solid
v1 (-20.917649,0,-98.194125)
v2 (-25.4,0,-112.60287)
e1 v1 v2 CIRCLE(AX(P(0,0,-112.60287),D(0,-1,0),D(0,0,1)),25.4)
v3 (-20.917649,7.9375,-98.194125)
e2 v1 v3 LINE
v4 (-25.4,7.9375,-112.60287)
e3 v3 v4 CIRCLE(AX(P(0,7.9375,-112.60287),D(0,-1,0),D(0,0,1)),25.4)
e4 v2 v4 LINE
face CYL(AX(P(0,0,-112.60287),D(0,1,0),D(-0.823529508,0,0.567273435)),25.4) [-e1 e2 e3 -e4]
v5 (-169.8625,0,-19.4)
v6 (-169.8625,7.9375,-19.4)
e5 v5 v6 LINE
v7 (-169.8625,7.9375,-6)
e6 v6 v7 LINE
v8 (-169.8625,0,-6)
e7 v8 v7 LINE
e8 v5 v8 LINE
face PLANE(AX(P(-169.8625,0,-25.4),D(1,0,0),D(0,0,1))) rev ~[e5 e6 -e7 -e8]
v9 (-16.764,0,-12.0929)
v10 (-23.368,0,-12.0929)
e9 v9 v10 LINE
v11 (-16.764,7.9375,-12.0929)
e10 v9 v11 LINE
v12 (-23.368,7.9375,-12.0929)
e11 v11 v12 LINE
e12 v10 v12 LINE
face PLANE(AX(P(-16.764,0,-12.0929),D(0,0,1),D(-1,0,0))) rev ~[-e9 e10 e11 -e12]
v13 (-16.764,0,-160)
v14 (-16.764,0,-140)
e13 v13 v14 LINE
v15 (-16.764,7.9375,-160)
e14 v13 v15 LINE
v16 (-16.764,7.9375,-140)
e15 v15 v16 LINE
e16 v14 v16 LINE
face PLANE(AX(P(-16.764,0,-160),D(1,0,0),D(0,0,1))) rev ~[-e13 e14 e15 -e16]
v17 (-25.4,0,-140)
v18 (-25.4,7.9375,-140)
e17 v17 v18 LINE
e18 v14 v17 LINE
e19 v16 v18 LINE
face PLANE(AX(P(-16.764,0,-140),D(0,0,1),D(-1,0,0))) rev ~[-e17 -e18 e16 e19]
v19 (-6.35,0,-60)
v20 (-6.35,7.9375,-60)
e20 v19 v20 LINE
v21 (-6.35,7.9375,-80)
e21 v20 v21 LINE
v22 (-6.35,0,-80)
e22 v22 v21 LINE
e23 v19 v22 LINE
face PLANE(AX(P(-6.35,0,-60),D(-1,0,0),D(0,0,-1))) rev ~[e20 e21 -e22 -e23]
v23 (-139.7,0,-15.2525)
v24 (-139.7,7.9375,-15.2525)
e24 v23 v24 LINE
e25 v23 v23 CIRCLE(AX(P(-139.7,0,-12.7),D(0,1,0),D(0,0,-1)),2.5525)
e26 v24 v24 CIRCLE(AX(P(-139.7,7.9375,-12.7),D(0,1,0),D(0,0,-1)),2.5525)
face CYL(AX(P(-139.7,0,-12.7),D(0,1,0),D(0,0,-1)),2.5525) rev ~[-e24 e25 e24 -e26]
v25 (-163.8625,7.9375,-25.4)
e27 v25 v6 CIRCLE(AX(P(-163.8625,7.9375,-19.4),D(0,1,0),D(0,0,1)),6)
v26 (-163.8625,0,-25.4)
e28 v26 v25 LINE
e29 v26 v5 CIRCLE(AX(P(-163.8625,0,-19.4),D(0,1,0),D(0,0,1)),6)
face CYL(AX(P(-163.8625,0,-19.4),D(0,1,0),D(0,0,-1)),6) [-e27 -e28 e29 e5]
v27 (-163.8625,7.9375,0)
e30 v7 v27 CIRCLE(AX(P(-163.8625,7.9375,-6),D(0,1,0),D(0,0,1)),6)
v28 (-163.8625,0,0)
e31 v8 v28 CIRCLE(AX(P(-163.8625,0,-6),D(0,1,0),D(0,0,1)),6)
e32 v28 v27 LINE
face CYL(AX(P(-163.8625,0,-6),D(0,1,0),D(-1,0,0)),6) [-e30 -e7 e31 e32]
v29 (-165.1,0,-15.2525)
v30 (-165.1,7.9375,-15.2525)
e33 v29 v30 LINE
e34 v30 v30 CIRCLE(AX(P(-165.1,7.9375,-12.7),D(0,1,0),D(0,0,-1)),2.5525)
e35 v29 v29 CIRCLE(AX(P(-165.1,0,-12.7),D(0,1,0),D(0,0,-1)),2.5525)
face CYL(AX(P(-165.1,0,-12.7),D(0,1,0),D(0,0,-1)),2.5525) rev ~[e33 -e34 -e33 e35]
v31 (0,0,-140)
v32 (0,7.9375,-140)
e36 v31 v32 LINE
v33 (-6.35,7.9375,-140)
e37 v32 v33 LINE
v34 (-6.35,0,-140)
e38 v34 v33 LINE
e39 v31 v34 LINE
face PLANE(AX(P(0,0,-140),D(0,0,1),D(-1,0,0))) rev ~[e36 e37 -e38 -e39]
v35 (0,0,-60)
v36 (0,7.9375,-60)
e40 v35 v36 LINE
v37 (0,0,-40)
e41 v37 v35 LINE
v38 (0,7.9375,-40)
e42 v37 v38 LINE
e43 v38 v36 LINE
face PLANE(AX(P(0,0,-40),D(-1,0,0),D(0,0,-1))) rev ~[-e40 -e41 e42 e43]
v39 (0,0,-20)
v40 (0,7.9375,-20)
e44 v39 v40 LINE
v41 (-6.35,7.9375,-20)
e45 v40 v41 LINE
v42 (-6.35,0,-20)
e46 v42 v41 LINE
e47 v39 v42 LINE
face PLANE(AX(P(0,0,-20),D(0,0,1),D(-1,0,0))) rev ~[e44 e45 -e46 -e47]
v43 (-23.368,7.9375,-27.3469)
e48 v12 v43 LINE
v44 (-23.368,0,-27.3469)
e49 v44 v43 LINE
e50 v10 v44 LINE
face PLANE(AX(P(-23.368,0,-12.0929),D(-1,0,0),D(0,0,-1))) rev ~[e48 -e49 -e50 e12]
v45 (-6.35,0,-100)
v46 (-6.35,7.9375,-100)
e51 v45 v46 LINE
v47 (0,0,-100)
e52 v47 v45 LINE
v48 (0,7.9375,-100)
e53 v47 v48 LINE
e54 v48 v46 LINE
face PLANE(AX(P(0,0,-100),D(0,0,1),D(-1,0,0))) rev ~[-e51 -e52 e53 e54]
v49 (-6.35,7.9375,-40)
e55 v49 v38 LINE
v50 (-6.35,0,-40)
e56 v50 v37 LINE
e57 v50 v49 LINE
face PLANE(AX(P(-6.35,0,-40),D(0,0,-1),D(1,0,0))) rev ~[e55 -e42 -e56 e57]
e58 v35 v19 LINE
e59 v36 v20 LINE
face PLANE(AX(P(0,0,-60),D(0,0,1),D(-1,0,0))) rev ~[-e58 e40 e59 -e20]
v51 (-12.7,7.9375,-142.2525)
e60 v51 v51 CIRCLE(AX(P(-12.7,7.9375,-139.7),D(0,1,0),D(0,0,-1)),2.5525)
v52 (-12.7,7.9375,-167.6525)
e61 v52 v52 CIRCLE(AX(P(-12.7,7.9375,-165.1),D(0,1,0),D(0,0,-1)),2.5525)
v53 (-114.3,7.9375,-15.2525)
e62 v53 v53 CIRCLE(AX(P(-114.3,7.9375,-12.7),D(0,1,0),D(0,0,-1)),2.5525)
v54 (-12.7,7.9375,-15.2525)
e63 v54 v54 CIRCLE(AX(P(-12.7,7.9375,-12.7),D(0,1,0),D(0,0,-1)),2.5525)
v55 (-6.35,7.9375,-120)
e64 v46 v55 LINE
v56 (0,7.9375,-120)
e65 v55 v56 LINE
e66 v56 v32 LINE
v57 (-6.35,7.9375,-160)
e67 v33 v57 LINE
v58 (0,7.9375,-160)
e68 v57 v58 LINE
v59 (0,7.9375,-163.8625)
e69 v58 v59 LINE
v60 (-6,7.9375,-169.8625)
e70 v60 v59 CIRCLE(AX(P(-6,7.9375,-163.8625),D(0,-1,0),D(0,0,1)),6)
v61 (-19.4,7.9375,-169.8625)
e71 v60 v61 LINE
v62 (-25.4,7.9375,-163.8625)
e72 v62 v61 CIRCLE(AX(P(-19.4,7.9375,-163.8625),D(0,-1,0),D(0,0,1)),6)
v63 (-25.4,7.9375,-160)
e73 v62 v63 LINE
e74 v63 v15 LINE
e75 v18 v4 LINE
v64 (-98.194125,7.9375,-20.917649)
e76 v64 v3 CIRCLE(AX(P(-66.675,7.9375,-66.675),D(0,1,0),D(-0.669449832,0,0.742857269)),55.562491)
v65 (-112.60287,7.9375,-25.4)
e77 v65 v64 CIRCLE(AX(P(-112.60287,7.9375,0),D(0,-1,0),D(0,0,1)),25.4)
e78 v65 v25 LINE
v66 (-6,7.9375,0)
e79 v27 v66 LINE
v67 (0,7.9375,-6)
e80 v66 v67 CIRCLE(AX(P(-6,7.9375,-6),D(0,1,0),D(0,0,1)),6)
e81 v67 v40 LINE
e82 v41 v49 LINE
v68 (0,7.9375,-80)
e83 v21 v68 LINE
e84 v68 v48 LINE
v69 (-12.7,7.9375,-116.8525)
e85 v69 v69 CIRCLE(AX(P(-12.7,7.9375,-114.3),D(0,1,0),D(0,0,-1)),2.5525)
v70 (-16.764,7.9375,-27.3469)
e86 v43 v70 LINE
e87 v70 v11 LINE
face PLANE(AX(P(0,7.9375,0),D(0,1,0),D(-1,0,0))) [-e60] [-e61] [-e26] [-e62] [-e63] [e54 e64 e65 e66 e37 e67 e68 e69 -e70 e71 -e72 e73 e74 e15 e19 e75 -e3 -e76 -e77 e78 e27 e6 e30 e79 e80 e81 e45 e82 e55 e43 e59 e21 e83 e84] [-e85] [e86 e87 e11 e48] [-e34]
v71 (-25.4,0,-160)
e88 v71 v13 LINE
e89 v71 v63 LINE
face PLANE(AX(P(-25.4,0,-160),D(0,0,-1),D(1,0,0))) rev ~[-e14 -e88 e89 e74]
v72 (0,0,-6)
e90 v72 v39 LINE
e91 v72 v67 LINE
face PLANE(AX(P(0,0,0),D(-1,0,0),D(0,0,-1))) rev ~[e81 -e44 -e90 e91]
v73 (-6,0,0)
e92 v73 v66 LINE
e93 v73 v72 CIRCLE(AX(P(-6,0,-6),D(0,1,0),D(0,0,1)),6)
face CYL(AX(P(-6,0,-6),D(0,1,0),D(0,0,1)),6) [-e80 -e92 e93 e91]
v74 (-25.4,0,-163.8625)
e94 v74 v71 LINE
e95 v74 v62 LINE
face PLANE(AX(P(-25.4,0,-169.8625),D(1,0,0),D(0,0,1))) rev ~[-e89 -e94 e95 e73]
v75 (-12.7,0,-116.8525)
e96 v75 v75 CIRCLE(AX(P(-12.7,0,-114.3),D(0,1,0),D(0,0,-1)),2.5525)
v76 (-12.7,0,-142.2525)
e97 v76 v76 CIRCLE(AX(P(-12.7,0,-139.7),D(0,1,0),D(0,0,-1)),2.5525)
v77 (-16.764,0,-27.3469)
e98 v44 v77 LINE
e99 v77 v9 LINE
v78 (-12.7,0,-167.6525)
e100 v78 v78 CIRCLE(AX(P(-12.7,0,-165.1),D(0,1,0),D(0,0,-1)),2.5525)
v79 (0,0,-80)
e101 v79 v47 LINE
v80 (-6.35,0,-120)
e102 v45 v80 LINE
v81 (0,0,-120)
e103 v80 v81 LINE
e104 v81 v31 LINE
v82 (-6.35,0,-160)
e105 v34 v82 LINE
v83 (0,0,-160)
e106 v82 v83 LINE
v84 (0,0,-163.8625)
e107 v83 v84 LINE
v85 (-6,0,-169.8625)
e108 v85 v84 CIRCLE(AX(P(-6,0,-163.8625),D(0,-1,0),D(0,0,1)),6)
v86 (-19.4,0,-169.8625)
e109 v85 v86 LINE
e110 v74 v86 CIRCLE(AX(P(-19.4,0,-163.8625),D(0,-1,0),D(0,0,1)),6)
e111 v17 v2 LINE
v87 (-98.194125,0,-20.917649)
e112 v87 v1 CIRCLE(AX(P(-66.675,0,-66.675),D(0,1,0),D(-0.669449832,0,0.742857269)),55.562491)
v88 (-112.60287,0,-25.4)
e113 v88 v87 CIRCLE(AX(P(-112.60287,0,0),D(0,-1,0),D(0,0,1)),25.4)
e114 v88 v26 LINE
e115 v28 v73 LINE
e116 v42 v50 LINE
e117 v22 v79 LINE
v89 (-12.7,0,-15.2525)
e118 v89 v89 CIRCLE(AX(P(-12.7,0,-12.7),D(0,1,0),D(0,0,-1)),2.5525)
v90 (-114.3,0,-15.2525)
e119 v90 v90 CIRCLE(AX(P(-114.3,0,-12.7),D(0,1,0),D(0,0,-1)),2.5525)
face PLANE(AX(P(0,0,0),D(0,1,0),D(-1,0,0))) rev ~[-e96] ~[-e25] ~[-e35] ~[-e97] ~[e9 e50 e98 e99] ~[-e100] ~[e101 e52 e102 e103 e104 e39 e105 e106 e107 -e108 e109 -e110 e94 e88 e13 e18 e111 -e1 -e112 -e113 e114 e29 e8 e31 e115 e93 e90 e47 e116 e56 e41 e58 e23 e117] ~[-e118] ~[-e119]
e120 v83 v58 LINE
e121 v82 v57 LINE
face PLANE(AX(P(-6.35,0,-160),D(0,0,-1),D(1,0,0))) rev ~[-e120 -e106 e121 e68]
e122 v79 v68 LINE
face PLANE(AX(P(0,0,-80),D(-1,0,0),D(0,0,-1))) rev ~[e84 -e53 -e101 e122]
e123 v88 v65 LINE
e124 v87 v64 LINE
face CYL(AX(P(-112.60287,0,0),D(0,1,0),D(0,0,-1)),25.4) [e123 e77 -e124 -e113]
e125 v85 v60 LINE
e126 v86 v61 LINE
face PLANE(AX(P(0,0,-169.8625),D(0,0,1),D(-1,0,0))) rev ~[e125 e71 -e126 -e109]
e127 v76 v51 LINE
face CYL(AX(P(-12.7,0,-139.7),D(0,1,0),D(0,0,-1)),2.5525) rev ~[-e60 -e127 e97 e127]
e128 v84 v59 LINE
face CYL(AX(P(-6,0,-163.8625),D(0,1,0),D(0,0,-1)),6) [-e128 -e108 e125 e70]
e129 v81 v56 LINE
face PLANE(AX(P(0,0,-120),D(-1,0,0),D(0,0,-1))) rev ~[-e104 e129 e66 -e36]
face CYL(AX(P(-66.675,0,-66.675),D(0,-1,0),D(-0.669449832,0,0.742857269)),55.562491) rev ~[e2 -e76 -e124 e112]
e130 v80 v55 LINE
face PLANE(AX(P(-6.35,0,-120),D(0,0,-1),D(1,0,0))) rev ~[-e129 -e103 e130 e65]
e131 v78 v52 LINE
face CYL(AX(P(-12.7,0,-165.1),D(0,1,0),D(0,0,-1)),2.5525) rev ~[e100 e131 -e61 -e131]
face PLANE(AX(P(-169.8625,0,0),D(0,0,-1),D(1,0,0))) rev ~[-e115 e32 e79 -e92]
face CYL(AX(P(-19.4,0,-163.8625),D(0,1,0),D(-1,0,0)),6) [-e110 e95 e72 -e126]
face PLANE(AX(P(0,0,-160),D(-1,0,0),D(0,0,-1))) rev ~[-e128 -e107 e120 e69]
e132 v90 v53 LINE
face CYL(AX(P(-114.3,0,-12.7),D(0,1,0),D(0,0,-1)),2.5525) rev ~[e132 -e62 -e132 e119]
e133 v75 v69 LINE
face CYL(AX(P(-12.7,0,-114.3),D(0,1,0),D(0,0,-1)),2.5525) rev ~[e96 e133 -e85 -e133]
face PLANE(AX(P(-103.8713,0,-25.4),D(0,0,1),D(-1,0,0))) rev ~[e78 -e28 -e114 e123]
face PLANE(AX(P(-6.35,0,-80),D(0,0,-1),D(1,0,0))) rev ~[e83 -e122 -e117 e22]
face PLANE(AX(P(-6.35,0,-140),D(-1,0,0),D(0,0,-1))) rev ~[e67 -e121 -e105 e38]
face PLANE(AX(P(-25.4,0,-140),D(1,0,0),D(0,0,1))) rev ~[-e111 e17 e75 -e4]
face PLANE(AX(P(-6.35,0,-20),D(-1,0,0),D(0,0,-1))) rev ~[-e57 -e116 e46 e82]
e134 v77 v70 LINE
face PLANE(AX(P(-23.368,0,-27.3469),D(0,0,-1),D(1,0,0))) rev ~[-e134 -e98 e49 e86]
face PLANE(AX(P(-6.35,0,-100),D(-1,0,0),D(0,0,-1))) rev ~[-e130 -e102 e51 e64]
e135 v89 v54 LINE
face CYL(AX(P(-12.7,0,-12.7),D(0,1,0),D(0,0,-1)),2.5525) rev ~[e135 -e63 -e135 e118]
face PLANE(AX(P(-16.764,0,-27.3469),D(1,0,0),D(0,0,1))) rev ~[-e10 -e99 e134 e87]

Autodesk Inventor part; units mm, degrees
ref_plane "YZ Plane" through (0, 0, 0) normal (1, 0, 0) x (0, 1, 0)
ref_plane "XZ Plane" through (0, 0, 0) normal (0, 1, 0) x (-1, 0, 0)
ref_plane "XY Plane" through (0, 0, 0) normal (0, 0, 1) x (1, 0, 0)
sketch "Sketch1" plane through (0, 0, 0) normal (0, 1, 0) x (-1, 0, 0)
  line L0 (169.8625, 0) -> (0, 0)
  line L1 (0, 0) -> (0, -169.8625)
  line L2 (0, -169.8625) -> (25.4, -169.8625)
  line L3 (25.4, -169.8625) -> (25.4, -103.8713)
  line L4 (103.8713, -25.4) -> (169.8625, -25.4)
  line L5 (169.8625, -25.4) -> (169.8625, 0)
  arc A0 (103.8713, -25.4) -> (25.4, -103.8713) centre (66.675, -66.675) ccw
  line L6 (0, 0) -> (66.675, -66.675) construction
  line L7 (0, -20) -> (6.35, -20)
  line L8 (6.35, -20) -> (6.35, -40)
  line L9 (6.35, -40) -> (0, -40)
  line L10 (0, -40) -> (0, -20)
  line L11 (6.35, -60) -> (6.35, -80)
  line L12 (0, -60) -> (6.35, -60)
  line L13 (6.35, -80) -> (0, -80)
  line L14 (6.35, -100) -> (6.35, -120)
  line L15 (0, -100) -> (6.35, -100)
  line L16 (6.35, -120) -> (0, -120)
  line L17 (6.35, -140) -> (6.35, -160)
  line L18 (0, -140) -> (6.35, -140)
  line L19 (6.35, -160) -> (0, -160)
  line L20 (23.368, -27.3469) -> (16.764, -27.3469)
  line L21 (16.764, -27.3469) -> (16.764, -12.0929)
  line L22 (16.764, -12.0929) -> (23.368, -12.0929)
  line L23 (23.368, -12.0929) -> (23.368, -27.3469)
  line L24 (23.368, -27.3469) -> (16.764, -12.0929) construction
  line L25 (16.764, -27.3469) -> (23.368, -12.0929) construction
  line L26 (25.4, -160) -> (16.764, -160)
  line L27 (16.764, -160) -> (16.764, -140)
  line L28 (16.764, -140) -> (25.4, -140)
  point P0 (103.8713, -25.4)
  point P1 (20.066, -19.7199)
  point P2 (20.066, -12.0929)
  dimension "d0" = 25.4
  dimension "d1" = 169.8625
  dimension "d2" = 25.4
  dimension "d3" = 169.8625
  dimension "d4" = 111.125
  dimension "d5" = 66.675
  dimension "d6" = 45
  dimension "d10" = 6.35
  dimension "d11" = 20
  dimension "d12" = 20
  dimension "d15" = 40
  dimension "d34" = 12.0929
  dimension "d35" = 6.604
  dimension "d36" = 20.066
  dimension "d37" = 15.254
extrude "Plate1" add sketch "Sketch1" along normal blind 7.9375 contours L5 L4 A0 L3 L28 L27 L26 L2 L1 L19 L17 L18 L16 L14 L15 L13 L11 L12 L9 L8 L7 L0
fillet "Corner Round1" radius 25.4 2 edges at (-103.8713, 3.9688, -25.4) (-25.4, 3.9688, -103.8713)
fillet "Corner Round2" radius 6 5 edges at (0, 3.9688, 0) (0, 3.9688, -169.8625) (-25.4, 3.9688, -169.8625) (-169.8625, 3.9688, 0) (-169.8625, 3.9688, -25.4)
sketch "Sketch2" plane through (0, 0, 0) normal (0, -1, 0) x (1, 0, 0)
  line L0 (-169.8625, -19.4) -> (-169.8625, -6) projected
  line L1 (-19.4, -169.8625) -> (-6, -169.8625) projected
  line L2 (-6, -169.8625) -> (-19.4, -169.8625) projected
  line L3 (0, -20) -> (0, -6) projected
  line L4 (-6, 0) -> (-163.8625, 0) projected
  point P0 (0, 0)
  point P1 (-165.1, -12.7)
  point P2 (-139.7, -12.7)
  point P3 (-114.3, -12.7)
  point P4 (-12.7, -165.1)
  point P5 (-12.7, -139.7)
  point P6 (-12.7, -114.3)
  point P7 (-169.8625, -12.7)
  point P8 (-169.8625, -12.7)
  point P9 (-12.7, -169.8625)
  point P10 (-12.7, -12.7)
  dimension "d21" = 25.4
  dimension "d22" = 25.4
  dimension "d23" = 25.4
  dimension "d24" = 25.4
  dimension "d25" = 4.7625
  dimension "d26" = 4.7625
  dimension "d38" = 12.7
  dimension "d39" = 12.7
hole "Hole1" at (-165.1, 0, -12.7) at (-139.7, 0, -12.7) at (-114.3, 0, -12.7) at (-12.7, 0, -165.1) at (-12.7, 0, -139.7) at (-12.7, 0, -114.3) at (-12.7, 0, -12.7) direction (0, 1, 0) diameter 5.105 depth 7.9375 tip angle 118 clearance for "Flat Head Machine Screw (82)" size "#10" standard "Ansi Unified Screw Threads"
equation "\"d22\" = d21"
equation "\"d23\" = d21"
equation "\"d24\" = d23"
equation "\"d2\" = d0"
equation "\"d3\" = d1"
equation "\"d12\" = d11"
equation "\"d15\" = 2 * d11"
equation "\"d32\" = Thickness"
equation "\"d8\" = Thickness"
equation "\"BendRadius\" = Thickness"
equation "\"BendReliefWidth\" = Thickness"
equation "\"BendReliefDepth\" = 0.5 * Thickness"
equation "\"CornerReliefSize\" = 4 * Thickness"
equation "\"MinimumRemnant\" = 2 * Thickness"
equation "\"TransitionRadius\" = BendRadius"
equation "\"JacobiRadiusSize\" = BendRadius"
equation "\"GapSize\" = Thickness"
equation "\"Thickness\" = 7.9375"
properties part number "INTAKE_SWERVE_MOUNT" material "Aluminum, 6061-T6"
